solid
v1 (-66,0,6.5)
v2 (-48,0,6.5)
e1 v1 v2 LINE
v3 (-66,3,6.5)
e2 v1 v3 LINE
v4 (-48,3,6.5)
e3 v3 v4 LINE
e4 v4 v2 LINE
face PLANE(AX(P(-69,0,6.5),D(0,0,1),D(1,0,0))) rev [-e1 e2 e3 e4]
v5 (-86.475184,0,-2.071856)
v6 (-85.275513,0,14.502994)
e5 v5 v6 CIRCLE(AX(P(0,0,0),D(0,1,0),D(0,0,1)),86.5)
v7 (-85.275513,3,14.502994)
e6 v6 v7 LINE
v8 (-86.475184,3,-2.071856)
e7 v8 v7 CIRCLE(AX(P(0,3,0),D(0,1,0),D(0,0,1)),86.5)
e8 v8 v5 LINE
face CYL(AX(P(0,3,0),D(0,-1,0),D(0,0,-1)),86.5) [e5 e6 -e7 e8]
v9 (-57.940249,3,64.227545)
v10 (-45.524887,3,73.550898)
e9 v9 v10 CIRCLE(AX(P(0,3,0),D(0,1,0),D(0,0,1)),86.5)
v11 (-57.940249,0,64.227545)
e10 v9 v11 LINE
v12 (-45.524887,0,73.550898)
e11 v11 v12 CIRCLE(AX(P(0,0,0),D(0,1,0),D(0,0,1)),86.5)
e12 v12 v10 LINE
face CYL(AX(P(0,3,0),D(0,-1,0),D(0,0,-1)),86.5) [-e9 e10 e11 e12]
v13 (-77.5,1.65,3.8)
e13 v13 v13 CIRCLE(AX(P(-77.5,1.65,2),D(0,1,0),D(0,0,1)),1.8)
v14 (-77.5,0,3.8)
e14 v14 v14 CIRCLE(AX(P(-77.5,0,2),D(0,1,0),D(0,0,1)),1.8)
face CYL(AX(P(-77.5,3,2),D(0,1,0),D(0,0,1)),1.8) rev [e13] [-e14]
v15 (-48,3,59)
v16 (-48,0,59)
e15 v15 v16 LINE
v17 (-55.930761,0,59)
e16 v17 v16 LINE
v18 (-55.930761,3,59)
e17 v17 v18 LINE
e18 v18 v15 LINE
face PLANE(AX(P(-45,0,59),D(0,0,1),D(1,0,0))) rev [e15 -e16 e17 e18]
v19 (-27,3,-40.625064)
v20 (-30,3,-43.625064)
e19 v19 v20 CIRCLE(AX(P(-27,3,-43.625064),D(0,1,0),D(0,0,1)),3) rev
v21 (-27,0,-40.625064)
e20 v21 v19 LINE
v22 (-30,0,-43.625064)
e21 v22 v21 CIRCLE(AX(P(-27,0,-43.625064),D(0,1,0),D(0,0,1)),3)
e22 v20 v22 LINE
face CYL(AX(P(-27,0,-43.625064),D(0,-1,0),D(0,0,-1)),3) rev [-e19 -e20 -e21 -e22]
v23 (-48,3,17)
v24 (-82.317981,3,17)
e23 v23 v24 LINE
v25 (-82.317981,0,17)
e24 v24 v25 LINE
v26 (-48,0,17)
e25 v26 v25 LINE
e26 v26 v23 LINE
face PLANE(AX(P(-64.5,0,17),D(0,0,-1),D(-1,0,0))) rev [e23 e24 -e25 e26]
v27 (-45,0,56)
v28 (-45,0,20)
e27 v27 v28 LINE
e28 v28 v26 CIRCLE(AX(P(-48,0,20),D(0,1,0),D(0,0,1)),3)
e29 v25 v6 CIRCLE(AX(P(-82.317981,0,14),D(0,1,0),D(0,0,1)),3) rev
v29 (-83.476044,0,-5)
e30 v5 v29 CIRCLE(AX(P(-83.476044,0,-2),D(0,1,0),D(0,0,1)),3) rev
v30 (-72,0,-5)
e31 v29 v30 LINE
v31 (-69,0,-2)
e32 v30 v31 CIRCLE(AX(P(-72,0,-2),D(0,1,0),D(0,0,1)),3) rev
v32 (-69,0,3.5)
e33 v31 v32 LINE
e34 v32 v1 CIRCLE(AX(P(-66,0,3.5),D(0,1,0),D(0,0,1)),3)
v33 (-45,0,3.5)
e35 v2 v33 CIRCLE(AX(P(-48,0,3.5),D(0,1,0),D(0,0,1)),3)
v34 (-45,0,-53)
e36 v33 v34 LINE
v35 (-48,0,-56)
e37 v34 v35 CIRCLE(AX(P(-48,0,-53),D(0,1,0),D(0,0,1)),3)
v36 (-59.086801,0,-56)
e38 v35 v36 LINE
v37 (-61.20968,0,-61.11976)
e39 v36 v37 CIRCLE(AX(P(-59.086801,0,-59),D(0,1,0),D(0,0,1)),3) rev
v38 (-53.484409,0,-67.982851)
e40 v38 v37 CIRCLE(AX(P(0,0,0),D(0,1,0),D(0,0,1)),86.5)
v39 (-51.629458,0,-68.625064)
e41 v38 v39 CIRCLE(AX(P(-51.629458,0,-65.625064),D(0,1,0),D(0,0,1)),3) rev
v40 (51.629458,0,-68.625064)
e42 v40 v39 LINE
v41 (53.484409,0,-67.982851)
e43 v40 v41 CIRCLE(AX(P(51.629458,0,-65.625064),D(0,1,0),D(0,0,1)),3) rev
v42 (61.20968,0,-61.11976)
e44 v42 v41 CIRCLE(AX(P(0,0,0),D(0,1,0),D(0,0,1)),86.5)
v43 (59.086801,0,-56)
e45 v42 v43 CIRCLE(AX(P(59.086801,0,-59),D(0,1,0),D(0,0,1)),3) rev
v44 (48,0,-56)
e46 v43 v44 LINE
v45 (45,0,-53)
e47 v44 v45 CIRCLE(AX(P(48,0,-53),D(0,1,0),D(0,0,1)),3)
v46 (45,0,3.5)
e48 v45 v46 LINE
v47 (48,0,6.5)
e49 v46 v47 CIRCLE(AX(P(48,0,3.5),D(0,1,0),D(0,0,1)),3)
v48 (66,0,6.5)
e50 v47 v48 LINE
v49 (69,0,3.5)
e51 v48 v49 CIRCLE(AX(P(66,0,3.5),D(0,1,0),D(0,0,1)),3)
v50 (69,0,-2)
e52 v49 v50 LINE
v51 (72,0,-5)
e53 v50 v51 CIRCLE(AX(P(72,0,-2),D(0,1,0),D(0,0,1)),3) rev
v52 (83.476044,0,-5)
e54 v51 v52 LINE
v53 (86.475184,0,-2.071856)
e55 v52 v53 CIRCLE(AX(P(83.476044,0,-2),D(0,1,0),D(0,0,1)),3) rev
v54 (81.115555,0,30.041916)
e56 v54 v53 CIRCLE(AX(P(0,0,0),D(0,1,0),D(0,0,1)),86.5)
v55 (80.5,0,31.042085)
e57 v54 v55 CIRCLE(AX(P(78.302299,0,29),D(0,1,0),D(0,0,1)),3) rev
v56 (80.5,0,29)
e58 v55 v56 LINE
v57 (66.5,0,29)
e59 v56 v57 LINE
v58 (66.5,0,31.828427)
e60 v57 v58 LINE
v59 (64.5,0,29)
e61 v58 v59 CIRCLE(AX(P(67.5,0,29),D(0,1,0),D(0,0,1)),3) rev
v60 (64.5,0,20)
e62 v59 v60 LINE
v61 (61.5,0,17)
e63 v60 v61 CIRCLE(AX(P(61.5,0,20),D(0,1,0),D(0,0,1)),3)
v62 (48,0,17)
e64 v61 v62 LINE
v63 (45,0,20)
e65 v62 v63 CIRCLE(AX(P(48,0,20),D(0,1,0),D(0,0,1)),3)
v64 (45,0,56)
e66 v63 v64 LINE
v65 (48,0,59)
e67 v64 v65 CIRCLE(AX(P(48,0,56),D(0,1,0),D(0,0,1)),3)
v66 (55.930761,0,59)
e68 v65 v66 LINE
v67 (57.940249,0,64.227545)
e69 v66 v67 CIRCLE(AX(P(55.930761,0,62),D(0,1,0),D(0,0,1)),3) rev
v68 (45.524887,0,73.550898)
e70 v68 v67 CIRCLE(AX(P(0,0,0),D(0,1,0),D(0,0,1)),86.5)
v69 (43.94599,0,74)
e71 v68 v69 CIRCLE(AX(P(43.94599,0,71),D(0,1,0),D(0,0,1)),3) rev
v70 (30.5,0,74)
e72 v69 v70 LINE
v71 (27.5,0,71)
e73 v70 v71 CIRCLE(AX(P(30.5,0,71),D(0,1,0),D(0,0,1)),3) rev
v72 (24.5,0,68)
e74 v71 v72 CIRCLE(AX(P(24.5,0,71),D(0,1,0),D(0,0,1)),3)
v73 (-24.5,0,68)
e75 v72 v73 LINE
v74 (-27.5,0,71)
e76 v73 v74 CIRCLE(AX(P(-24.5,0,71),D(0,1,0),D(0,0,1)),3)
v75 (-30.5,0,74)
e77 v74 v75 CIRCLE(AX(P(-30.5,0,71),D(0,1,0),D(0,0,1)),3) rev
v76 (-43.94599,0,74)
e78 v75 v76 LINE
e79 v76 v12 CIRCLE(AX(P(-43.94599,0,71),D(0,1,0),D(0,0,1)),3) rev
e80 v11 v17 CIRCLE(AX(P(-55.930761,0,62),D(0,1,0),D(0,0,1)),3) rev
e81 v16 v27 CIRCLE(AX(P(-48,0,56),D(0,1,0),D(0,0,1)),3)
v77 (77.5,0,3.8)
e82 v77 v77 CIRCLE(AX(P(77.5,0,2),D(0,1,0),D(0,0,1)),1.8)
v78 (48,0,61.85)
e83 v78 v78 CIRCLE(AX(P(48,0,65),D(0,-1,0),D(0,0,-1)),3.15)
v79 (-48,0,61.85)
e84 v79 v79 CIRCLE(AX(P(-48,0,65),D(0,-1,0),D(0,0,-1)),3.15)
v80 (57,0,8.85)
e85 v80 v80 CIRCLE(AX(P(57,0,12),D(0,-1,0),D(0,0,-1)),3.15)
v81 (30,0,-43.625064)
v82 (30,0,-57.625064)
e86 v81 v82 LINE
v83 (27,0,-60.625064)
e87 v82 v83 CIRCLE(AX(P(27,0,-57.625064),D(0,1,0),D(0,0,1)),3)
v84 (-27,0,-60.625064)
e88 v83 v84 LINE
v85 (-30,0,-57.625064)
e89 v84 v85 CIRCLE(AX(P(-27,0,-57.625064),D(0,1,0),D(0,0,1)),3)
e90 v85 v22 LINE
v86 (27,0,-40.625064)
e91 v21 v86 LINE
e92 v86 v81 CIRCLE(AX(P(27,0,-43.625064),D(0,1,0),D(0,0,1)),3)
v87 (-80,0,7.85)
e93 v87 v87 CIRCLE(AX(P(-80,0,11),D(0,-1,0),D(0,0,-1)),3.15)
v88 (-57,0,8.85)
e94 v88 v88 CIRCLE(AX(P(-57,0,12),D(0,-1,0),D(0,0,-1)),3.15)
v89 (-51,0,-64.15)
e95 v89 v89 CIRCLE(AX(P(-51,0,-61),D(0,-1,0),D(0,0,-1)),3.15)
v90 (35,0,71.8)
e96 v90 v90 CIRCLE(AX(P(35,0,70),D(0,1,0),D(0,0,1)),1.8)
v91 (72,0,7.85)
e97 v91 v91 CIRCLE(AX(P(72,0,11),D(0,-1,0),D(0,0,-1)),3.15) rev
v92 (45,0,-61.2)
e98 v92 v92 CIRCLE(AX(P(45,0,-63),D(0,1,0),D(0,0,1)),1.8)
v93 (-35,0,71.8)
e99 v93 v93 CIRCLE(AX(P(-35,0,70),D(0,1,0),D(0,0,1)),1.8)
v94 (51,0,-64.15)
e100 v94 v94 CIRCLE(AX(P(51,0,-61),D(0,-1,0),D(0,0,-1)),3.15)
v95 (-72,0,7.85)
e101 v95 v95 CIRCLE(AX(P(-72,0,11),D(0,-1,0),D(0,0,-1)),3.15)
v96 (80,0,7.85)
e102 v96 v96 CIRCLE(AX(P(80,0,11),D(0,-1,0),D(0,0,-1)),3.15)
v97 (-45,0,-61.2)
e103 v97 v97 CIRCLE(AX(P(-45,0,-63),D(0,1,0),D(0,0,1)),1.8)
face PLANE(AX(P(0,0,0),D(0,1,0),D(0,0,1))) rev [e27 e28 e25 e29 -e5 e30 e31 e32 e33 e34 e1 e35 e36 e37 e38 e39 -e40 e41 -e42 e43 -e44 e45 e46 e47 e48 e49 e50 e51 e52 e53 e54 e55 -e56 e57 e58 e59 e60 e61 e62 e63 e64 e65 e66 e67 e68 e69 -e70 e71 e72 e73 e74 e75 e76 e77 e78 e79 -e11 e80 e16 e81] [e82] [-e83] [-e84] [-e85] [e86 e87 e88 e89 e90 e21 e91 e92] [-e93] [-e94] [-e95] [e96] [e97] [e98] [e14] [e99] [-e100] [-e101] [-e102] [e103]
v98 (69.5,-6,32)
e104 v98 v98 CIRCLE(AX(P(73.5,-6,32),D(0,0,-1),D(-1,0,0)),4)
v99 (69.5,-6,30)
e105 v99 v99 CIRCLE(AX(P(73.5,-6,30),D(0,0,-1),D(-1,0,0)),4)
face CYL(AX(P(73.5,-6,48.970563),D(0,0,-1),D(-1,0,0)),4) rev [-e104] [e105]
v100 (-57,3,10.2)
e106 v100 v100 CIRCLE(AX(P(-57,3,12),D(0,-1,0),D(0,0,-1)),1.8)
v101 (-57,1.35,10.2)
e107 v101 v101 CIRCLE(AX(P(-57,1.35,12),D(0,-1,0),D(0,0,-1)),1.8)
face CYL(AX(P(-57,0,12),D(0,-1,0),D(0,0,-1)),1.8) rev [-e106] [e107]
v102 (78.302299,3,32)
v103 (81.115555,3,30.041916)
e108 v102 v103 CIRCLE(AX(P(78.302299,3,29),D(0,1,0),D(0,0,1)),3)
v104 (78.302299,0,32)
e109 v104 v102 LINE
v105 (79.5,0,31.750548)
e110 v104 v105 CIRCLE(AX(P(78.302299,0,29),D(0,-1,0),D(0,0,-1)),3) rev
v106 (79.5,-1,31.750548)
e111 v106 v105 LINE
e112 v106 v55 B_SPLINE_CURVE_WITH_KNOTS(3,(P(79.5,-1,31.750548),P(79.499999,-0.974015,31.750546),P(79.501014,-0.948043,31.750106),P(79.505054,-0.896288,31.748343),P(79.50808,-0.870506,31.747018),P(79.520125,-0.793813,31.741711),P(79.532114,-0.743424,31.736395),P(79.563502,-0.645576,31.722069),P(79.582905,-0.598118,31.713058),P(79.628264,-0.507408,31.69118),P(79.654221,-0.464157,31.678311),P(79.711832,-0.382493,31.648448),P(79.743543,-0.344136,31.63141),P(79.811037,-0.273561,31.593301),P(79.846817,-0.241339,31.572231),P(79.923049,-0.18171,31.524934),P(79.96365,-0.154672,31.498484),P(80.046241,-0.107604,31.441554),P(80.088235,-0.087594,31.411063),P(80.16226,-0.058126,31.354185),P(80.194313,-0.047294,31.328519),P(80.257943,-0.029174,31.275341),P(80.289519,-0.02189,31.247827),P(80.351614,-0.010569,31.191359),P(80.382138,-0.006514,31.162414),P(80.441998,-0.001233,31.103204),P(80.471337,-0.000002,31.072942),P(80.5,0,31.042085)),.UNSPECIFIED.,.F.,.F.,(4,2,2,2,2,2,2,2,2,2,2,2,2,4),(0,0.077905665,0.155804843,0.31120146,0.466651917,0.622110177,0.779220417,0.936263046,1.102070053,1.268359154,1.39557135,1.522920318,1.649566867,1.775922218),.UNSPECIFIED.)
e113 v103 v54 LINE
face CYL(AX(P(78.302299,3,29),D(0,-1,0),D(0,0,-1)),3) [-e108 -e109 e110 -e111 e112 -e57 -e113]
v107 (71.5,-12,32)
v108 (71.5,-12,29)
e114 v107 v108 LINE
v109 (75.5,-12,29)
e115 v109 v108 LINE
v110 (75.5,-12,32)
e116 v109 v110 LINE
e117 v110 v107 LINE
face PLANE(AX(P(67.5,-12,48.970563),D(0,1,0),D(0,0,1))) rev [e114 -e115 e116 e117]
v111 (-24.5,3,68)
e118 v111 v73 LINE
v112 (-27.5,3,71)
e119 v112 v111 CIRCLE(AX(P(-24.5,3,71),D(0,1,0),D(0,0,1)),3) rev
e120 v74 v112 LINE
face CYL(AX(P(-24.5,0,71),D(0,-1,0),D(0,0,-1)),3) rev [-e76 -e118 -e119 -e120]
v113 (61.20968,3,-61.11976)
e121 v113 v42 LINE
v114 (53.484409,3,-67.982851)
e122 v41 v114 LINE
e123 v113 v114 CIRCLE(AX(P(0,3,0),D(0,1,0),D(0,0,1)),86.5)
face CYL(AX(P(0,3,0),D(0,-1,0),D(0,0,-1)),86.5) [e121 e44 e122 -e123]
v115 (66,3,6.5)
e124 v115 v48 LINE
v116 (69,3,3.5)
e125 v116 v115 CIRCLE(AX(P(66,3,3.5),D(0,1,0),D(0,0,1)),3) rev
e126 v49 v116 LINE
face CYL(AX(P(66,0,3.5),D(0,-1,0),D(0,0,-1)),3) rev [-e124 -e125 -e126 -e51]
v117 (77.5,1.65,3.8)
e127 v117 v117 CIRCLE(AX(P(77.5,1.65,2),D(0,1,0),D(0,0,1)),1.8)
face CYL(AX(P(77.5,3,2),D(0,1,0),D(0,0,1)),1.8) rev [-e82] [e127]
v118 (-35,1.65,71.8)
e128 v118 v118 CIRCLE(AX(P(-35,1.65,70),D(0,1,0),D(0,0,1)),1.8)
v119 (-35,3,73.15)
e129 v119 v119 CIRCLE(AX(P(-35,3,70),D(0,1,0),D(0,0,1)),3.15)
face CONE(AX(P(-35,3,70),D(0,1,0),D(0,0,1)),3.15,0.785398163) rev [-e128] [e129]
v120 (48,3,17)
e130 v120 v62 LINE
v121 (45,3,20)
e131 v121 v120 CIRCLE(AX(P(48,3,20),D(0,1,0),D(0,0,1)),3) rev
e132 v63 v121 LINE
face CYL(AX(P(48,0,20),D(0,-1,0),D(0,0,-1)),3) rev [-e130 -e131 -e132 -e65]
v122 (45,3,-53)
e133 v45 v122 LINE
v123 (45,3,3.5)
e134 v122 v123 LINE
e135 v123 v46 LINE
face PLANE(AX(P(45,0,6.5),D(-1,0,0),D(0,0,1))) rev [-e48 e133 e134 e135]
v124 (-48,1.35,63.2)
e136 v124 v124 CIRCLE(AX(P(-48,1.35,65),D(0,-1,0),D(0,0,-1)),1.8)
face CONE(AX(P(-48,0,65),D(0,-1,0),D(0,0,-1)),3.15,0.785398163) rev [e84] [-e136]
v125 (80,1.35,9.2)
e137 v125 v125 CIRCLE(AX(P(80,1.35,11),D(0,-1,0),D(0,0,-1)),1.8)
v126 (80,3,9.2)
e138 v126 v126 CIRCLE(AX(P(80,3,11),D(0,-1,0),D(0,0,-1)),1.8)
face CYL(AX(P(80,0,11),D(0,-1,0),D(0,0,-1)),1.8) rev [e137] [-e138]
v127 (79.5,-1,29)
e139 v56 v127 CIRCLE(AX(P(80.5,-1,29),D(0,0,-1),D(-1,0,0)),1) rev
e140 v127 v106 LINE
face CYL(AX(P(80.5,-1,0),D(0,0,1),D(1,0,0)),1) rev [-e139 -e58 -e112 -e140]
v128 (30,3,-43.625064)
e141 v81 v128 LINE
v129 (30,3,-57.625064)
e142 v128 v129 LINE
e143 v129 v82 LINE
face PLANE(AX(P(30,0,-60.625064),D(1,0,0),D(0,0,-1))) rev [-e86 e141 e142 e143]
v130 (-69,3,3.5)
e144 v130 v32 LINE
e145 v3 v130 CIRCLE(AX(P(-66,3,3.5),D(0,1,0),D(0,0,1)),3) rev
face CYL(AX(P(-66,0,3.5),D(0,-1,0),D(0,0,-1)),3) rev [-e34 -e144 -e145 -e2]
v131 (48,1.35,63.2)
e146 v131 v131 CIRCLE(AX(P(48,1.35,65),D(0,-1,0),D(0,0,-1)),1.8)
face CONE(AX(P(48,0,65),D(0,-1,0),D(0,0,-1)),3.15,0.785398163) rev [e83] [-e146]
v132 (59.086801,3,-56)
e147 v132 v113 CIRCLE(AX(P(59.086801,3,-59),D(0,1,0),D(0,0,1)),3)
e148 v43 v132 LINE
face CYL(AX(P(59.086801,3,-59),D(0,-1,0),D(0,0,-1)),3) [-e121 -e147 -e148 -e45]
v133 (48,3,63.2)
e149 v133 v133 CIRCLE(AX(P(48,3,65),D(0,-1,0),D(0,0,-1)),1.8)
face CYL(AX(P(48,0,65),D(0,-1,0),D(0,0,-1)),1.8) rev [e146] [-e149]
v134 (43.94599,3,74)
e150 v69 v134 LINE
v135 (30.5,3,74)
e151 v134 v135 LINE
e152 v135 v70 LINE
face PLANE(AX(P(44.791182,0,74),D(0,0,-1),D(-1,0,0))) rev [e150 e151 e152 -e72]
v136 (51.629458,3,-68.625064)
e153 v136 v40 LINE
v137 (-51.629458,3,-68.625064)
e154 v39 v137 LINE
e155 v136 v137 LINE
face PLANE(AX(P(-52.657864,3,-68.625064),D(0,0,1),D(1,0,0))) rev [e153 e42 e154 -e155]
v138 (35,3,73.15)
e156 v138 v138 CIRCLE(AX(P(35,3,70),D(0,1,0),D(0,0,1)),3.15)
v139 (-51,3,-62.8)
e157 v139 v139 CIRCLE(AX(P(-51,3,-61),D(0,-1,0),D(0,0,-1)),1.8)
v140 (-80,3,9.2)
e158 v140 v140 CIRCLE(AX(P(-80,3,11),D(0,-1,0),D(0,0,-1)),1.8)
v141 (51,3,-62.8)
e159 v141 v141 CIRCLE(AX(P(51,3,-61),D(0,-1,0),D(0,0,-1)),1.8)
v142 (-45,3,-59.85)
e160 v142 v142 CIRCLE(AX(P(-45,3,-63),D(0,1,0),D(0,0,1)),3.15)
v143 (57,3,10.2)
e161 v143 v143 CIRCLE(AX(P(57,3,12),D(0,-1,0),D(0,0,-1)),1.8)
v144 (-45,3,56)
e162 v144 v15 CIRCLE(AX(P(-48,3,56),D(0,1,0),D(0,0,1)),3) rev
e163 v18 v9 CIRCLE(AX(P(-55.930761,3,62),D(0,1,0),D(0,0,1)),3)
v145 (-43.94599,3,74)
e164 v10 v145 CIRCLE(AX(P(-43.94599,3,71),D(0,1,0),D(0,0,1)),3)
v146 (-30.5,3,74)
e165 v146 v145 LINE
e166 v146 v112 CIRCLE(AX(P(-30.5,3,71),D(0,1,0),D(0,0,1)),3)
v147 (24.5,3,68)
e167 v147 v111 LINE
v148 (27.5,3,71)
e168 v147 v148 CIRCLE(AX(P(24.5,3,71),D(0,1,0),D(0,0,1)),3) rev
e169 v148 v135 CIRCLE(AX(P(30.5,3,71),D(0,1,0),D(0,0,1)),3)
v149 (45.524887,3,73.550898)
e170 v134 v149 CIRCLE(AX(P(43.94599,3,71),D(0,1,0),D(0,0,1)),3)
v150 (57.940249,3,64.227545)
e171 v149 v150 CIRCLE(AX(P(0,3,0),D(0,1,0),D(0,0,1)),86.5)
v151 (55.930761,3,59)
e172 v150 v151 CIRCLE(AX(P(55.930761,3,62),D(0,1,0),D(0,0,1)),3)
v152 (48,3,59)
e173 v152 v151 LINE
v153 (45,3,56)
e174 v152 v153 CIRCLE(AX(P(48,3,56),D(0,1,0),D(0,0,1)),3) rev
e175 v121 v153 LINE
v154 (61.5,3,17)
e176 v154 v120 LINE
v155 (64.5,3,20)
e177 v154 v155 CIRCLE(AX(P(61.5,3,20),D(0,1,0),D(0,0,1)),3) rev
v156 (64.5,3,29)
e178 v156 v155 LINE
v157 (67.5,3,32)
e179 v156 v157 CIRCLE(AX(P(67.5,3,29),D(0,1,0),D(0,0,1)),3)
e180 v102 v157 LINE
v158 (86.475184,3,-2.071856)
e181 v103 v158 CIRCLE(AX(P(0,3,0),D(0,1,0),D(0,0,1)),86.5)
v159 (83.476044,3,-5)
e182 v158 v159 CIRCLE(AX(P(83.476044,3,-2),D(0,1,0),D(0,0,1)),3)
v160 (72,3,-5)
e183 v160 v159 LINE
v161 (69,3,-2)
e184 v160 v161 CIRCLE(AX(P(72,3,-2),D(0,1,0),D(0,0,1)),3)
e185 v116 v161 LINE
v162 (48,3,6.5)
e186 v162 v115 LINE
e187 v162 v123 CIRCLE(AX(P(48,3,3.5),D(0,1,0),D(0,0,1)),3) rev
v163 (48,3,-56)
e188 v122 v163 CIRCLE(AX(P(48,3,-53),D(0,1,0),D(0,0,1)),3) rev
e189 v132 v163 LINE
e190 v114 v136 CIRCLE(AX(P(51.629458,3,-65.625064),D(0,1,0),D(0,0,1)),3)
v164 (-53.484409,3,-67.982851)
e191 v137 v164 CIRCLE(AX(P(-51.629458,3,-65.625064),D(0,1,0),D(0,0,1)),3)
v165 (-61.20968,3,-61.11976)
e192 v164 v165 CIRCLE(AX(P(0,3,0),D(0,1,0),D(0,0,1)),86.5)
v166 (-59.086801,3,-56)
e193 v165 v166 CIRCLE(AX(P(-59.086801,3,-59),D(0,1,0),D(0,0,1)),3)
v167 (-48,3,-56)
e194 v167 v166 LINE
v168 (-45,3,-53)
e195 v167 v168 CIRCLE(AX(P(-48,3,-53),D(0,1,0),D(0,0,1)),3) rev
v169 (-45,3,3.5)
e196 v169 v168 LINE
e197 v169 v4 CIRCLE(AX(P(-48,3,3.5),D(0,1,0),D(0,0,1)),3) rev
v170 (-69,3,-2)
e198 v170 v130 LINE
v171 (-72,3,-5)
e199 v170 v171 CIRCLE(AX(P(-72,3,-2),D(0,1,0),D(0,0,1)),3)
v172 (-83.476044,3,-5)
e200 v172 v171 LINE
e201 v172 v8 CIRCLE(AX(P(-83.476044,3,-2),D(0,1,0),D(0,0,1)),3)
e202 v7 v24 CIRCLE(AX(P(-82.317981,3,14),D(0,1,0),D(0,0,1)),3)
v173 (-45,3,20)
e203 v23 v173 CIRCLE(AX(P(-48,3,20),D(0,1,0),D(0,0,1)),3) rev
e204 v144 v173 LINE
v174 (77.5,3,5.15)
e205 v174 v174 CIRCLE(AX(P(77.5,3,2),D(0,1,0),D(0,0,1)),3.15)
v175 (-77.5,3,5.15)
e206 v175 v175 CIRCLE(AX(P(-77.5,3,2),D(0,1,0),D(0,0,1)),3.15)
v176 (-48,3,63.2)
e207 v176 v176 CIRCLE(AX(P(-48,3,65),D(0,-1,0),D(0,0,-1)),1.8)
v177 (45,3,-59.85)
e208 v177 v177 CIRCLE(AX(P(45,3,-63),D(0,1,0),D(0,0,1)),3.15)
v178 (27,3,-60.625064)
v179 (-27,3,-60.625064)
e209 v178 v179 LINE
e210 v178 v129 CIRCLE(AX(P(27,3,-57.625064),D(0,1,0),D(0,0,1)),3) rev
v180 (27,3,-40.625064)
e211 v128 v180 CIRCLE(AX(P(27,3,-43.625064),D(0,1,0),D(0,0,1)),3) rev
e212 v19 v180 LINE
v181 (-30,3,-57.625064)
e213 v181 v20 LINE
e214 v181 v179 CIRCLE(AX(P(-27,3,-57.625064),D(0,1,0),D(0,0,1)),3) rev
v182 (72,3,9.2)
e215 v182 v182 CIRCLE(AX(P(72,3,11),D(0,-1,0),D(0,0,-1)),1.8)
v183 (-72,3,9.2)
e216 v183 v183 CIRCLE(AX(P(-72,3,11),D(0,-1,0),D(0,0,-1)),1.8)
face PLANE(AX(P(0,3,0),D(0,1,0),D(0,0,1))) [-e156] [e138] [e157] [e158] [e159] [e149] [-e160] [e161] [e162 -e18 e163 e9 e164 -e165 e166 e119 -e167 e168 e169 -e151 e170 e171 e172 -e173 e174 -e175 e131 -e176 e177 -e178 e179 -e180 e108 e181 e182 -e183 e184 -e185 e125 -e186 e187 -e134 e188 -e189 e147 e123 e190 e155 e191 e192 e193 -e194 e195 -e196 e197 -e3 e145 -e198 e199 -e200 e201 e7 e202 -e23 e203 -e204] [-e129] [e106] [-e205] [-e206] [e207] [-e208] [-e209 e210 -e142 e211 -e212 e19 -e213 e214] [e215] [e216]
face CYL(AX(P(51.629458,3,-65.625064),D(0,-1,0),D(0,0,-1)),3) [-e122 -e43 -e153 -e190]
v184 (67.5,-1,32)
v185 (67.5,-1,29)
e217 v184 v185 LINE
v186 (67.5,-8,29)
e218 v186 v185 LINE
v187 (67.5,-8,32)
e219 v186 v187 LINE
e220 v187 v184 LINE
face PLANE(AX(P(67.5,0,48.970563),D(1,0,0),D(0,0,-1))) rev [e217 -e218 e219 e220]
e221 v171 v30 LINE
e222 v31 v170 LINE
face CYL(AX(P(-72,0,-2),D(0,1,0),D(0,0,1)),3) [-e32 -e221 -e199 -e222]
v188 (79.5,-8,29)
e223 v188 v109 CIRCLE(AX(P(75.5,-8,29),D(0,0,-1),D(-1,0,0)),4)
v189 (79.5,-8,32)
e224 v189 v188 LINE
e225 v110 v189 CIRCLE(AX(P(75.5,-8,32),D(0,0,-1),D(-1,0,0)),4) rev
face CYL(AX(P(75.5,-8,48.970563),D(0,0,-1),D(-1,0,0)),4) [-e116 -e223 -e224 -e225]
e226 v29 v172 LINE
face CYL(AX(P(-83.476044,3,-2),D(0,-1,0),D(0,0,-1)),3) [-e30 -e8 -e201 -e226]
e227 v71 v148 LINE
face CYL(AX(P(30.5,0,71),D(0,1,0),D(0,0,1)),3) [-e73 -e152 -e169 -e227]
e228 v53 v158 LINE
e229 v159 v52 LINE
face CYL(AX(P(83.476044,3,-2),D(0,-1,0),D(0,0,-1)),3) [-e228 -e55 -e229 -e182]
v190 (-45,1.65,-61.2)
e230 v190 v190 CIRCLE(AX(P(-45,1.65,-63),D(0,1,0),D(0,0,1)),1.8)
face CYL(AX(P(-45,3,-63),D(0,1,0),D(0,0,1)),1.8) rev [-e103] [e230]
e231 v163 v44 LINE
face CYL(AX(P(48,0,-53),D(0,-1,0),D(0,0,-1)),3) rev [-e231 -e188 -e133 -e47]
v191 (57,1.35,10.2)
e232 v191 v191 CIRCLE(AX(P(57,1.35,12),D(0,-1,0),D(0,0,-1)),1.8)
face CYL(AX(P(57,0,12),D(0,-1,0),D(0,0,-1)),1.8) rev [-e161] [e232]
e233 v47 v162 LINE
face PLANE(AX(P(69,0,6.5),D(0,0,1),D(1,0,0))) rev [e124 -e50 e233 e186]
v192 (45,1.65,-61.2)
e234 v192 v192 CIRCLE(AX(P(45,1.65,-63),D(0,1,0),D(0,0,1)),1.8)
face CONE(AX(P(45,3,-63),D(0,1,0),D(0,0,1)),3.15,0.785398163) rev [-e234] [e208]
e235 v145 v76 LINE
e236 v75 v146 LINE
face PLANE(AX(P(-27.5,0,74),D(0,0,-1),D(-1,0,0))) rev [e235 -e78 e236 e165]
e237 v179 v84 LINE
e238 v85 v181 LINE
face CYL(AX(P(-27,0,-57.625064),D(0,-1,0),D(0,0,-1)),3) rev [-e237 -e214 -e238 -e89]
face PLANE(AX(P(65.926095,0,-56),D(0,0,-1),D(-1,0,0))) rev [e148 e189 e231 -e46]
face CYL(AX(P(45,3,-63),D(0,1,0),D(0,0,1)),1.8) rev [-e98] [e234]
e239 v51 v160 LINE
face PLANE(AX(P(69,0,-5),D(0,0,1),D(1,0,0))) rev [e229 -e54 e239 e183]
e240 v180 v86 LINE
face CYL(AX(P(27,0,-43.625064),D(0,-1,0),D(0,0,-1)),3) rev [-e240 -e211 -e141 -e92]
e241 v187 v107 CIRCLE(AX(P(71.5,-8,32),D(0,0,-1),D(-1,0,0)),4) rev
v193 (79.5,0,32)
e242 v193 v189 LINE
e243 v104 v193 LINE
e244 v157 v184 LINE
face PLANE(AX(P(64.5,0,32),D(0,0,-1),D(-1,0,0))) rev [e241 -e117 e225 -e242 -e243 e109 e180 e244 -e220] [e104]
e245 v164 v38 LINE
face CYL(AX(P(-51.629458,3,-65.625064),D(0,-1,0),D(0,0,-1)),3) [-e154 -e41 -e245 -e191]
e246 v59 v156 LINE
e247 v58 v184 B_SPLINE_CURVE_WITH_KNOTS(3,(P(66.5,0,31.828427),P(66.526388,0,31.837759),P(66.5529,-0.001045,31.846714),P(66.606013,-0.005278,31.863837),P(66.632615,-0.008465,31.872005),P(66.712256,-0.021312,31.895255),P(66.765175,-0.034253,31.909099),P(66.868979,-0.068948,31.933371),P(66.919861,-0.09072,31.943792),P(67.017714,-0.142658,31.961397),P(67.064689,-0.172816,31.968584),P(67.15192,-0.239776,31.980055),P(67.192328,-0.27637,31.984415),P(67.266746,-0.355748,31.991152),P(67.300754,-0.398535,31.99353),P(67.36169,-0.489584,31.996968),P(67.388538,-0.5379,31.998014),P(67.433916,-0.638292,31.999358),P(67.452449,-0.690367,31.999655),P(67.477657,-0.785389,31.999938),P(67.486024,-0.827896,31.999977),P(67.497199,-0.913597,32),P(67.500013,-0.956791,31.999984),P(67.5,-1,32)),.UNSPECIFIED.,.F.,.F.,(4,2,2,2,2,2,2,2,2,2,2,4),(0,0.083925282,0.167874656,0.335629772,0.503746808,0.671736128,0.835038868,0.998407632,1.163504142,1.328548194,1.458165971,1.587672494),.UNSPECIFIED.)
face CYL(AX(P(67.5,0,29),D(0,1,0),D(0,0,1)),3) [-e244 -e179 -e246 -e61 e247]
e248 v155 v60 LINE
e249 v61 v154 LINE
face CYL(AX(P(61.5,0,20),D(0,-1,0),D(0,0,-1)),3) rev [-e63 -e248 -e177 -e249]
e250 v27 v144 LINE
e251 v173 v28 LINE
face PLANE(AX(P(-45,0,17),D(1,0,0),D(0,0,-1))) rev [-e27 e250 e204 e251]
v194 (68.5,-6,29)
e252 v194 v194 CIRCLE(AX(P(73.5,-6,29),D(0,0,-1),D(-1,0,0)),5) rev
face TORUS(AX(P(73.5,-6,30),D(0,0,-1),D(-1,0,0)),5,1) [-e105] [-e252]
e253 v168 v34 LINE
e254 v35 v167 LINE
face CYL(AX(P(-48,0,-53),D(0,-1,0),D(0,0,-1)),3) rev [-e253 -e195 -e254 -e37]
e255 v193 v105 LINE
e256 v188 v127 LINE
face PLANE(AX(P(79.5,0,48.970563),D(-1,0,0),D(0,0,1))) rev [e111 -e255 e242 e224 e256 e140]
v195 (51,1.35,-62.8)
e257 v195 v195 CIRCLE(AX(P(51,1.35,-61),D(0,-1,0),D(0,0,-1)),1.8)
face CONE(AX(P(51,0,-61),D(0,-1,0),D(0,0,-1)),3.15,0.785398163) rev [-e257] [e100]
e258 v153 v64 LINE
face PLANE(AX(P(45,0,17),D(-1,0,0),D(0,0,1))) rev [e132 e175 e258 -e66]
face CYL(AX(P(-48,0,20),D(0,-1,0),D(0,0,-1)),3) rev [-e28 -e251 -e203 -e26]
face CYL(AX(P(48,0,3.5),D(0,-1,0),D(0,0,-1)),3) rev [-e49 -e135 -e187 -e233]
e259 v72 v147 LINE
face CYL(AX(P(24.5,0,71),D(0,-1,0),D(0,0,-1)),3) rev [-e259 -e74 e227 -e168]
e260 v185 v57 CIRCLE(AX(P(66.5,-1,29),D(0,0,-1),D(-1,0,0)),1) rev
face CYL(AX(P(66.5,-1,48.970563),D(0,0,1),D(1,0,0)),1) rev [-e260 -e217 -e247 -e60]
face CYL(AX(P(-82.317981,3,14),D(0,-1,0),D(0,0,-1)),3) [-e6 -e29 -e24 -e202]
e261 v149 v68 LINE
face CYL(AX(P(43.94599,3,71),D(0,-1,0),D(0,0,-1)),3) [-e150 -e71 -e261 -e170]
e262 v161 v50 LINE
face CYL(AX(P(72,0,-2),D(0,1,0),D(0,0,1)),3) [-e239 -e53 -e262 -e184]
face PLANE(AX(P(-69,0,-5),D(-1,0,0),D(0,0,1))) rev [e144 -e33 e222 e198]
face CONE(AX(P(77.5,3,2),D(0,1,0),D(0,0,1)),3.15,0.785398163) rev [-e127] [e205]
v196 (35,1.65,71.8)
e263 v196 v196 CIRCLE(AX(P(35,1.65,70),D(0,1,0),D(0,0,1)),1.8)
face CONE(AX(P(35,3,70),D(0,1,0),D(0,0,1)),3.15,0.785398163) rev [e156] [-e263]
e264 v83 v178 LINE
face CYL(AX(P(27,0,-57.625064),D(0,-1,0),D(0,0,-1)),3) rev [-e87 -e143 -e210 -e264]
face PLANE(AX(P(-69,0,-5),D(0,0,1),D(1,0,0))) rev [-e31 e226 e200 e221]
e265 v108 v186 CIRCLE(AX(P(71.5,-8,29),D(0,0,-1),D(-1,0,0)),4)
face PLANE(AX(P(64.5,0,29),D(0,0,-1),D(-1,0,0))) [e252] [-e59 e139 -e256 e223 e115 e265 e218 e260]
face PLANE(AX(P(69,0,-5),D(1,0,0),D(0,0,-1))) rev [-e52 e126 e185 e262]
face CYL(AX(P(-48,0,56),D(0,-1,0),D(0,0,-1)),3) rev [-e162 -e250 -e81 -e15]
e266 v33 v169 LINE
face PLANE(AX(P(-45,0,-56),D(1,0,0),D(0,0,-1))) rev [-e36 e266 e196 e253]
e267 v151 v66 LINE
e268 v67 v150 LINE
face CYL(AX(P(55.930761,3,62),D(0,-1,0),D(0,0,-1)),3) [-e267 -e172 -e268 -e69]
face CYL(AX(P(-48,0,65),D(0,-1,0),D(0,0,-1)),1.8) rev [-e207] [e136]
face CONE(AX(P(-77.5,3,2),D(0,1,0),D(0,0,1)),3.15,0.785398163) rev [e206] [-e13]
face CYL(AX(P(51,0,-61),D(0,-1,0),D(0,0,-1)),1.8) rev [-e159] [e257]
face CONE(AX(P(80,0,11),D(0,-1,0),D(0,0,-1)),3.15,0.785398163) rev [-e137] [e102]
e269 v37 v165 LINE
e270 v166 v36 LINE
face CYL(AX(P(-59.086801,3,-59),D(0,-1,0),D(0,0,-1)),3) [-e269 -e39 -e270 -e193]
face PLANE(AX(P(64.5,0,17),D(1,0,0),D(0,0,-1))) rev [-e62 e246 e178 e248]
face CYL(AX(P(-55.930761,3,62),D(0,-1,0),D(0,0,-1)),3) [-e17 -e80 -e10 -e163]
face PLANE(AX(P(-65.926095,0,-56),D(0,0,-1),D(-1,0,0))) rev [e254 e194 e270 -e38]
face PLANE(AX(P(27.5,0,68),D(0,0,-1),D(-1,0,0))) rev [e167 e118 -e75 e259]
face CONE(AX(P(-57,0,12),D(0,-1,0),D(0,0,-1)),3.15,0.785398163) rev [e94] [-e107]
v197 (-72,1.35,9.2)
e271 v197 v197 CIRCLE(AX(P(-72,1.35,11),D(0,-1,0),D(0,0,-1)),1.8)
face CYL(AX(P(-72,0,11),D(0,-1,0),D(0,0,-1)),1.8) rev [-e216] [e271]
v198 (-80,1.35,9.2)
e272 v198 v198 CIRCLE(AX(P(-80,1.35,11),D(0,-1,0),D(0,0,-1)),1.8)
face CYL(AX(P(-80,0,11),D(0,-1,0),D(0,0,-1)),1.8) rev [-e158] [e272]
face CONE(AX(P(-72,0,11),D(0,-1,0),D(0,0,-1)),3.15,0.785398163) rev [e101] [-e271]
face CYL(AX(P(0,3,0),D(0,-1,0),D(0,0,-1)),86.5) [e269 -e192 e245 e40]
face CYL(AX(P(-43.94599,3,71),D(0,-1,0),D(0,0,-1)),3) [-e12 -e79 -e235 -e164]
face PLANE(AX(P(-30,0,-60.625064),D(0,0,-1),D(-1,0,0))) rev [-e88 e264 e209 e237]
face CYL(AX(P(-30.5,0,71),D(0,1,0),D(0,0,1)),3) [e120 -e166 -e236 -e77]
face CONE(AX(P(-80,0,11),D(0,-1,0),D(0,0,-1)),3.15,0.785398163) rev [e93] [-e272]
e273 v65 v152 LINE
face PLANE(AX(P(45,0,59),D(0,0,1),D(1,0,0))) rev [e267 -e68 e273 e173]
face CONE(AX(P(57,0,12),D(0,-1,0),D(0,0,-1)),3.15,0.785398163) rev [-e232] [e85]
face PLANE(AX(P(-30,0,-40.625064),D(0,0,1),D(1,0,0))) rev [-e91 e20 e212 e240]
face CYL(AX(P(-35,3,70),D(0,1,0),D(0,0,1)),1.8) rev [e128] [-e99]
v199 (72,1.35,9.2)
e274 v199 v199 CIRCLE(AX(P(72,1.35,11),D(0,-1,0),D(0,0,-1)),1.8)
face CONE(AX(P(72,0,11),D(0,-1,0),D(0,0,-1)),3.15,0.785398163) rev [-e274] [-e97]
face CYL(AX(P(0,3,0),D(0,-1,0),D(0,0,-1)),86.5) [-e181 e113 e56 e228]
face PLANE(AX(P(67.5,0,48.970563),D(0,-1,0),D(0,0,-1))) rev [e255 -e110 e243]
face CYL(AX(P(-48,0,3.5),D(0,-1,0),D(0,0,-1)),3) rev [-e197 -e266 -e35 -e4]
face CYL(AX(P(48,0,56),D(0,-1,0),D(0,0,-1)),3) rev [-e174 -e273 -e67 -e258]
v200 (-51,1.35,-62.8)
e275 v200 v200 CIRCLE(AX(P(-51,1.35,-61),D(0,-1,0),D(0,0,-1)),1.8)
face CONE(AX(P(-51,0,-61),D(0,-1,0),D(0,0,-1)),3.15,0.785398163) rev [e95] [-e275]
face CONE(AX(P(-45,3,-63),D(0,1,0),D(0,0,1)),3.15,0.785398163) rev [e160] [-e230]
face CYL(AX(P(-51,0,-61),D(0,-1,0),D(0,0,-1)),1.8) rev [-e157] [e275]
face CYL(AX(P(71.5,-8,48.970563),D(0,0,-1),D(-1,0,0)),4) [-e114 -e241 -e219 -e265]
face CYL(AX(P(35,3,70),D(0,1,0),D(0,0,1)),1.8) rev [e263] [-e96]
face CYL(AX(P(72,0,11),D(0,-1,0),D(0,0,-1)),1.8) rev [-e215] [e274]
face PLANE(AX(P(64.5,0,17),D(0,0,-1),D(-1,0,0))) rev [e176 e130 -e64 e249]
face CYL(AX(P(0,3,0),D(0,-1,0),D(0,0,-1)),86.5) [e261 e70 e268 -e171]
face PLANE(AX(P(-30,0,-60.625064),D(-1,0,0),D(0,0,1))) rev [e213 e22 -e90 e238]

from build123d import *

# Parameters (mm, degrees)
BOSS_EXTRUDE1_DEPTH                           = 3
CSK_FOR_M3_COUNTERSUNK_FLAT_HEAD_SCR_2_COUNT  = 2
CSK_FOR_M3_COUNTERSUNK_FLAT_HEAD_SCR_2_PITCH  = 90
CSK_FOR_M3_COUNTERSUNK_FLAT_HEAD_SCR_3_COUNT  = 2
CSK_FOR_M3_COUNTERSUNK_FLAT_HEAD_SCR_3_PITCH  = 138.676782484
CSK_FOR_M3_COUNTERSUNK_FLAT_HEAD_SCR_4_COUNT  = 2
CSK_FOR_M3_COUNTERSUNK_FLAT_HEAD_SCR_4_PITCH  = 72.672209269
CSK_FOR_M3_COUNTERSUNK_FLAT_HEAD_SCR_5_COUNT  = 2
CSK_FOR_M3_COUNTERSUNK_FLAT_HEAD_SCR_5_PITCH  = 133.375410027
CSK_FOR_M3_COUNTERSUNK_FLAT_HEAD_SCR_6_COUNT  = 2
CSK_FOR_M3_COUNTERSUNK_FLAT_HEAD_SCR_6_PITCH  = 155.206314305
CSK_FOR_M3_COUNTERSUNK_FLAT_HEAD_SCR_7_COUNT  = 2
CSK_FOR_M3_COUNTERSUNK_FLAT_HEAD_SCR_7_PITCH  = 102
CSK_FOR_M3_COUNTERSUNK_FLAT_HEAD_SCR_8_COUNT  = 2
CSK_FOR_M3_COUNTERSUNK_FLAT_HEAD_SCR_8_PITCH  = 126.035709226
CSK_FOR_M3_COUNTERSUNK_FLAT_HEAD_SCR_9_COUNT  = 2
CSK_FOR_M3_COUNTERSUNK_FLAT_HEAD_SCR_9_PITCH  = 160.240444333
CSK_FOR_M3_COUNTERSUNK_FLAT_HEAD_SCR_10_COUNT = 2
CSK_FOR_M3_COUNTERSUNK_FLAT_HEAD_SCR_10_PITCH = 77.620873481
CSK_FOR_M3_COUNTERSUNK_FLAT_HEAD_SCR_11_COUNT = 2
CSK_FOR_M3_COUNTERSUNK_FLAT_HEAD_SCR_11_PITCH = 149.48244044
CSK_FOR_M3_COUNTERSUNK_FLAT_HEAD_SCR_12_COUNT = 2
CSK_FOR_M3_COUNTERSUNK_FLAT_HEAD_SCR_12_PITCH = 73.246160309
CSK_FOR_M3_COUNTERSUNK_FLAT_HEAD_SCR_13_COUNT = 2
CSK_FOR_M3_COUNTERSUNK_FLAT_HEAD_SCR_13_PITCH = 130.357201566
CSK_FOR_M3_COUNTERSUNK_FLAT_HEAD_SCR_14_COUNT = 2
CSK_FOR_M3_COUNTERSUNK_FLAT_HEAD_SCR_14_PITCH = 142.523682243
CSK_FOR_M3_COUNTERSUNK_FLAT_HEAD_SCR_15_COUNT = 2
CSK_FOR_M3_COUNTERSUNK_FLAT_HEAD_SCR_15_PITCH = 75
SKETCH14_W                                    = 60
SKETCH14_H                                    = 20
CUT_EXTRUDE1_DEPTH                            = 123.366253518
FILLET1_R                                     = 3
BOSS_EXTRUDE3_REACH                           = 115.874
SKETCH21_W                                    = 12
SKETCH21_H                                    = 12
SKETCH21_R                                    = 4
SKETCH21_2_W                                  = 12
SKETCH21_2_H                                  = 12
CUT_EXTRUDE3_DEPTH                            = 29
FILLET2_R                                     = 4
FILLET3_R                                     = 1


with BuildPart() as part:
    # Sketch1 → Boss-Extrude1 (new body)
    with BuildSketch(Plane(origin=(0, 0, 0), x_dir=(1, 0, 0), z_dir=(0, 1, 0))):
        with BuildLine():
            Line((-52.657863609, 68.625063935), (52.657863609, 68.625063935))
            ThreePointArc((52.657863609, 68.625063935), (0, -86.5), (-52.657863609, 68.625063935))
        make_face()
    extrude(amount=BOSS_EXTRUDE1_DEPTH)

    # Sketch9 → CSK for M3 Countersunk Flat Head Screw3 (revolve, cut)
    with BuildSketch(Plane(origin=(-45, 3, -63), x_dir=(0, 0, 1), z_dir=(1, 0, 0))):
        Polygon((0, 0), (0, 3), (1.8, 3), (1.8, 1.35), (3.15, 0), align=None)
    csk_for_m3_countersunk_flat_head_screw3 = revolve(axis=Axis((-45, 9.35, -63), (0, -1, 0)), mode=Mode.SUBTRACT)

    # CSK for M3 Countersunk Flat Head Scr 2: CSK for M3 Countersunk Flat Head Screw3 ×2
    with Locations(*[(i * CSK_FOR_M3_COUNTERSUNK_FLAT_HEAD_SCR_2_PITCH, 0, 0) for i in range(1, CSK_FOR_M3_COUNTERSUNK_FLAT_HEAD_SCR_2_COUNT)]):
        add(csk_for_m3_countersunk_flat_head_screw3, mode=Mode.SUBTRACT)

    # CSK for M3 Countersunk Flat Head Scr 3: CSK for M3 Countersunk Flat Head Screw3 ×2
    with Locations(*[Vector(0.8833490206949295, 0, 0.46871580689935033) * (i * CSK_FOR_M3_COUNTERSUNK_FLAT_HEAD_SCR_3_PITCH) for i in range(1, CSK_FOR_M3_COUNTERSUNK_FLAT_HEAD_SCR_3_COUNT)]):
        add(csk_for_m3_countersunk_flat_head_screw3, mode=Mode.SUBTRACT)

    # CSK for M3 Countersunk Flat Head Scr 4: CSK for M3 Countersunk Flat Head Screw3 ×2
    with Locations(*[Vector(-0.4472135954999581, 0, 0.894427190999916) * (i * CSK_FOR_M3_COUNTERSUNK_FLAT_HEAD_SCR_4_PITCH) for i in range(1, CSK_FOR_M3_COUNTERSUNK_FLAT_HEAD_SCR_4_COUNT)]):
        add(csk_for_m3_countersunk_flat_head_screw3, mode=Mode.SUBTRACT)

    # CSK for M3 Countersunk Flat Head Scr 5: CSK for M3 Countersunk Flat Head Screw3 ×2
    with Locations(*[Vector(0.07497633932626105, 0, 0.9971853130392733) * (i * CSK_FOR_M3_COUNTERSUNK_FLAT_HEAD_SCR_5_PITCH) for i in range(1, CSK_FOR_M3_COUNTERSUNK_FLAT_HEAD_SCR_5_COUNT)]):
        add(csk_for_m3_countersunk_flat_head_screw3, mode=Mode.SUBTRACT)

    # CSK for M3 Countersunk Flat Head Scr 6: CSK for M3 Countersunk Flat Head Screw3 ×2
    with Locations(*[Vector(0.5154429467542566, 0, 0.8569238989789517) * (i * CSK_FOR_M3_COUNTERSUNK_FLAT_HEAD_SCR_6_PITCH) for i in range(1, CSK_FOR_M3_COUNTERSUNK_FLAT_HEAD_SCR_6_COUNT)]):
        add(csk_for_m3_countersunk_flat_head_screw3, mode=Mode.SUBTRACT)

    # Sketch13 → CSK for M3 Countersunk Flat Head Screw4 (revolve, cut)
    with BuildSketch(Plane(origin=(-51, 0, -61), x_dir=(0, 0, -1), z_dir=(1, 0, 0))):
        Polygon((0, 0), (0, 3), (1.8, 3), (1.8, 1.35), (3.15, 0), align=None)
    csk_for_m3_countersunk_flat_head_screw4 = revolve(axis=Axis((-51, -6.35, -61), (0, 1, 0)), mode=Mode.SUBTRACT)

    # CSK for M3 Countersunk Flat Head Scr 7: CSK for M3 Countersunk Flat Head Screw4 ×2
    with Locations(*[(i * CSK_FOR_M3_COUNTERSUNK_FLAT_HEAD_SCR_7_PITCH, 0, 0) for i in range(1, CSK_FOR_M3_COUNTERSUNK_FLAT_HEAD_SCR_7_COUNT)]):
        add(csk_for_m3_countersunk_flat_head_screw4, mode=Mode.SUBTRACT)

    # CSK for M3 Countersunk Flat Head Scr 8: CSK for M3 Countersunk Flat Head Screw4 ×2
    with Locations(*[Vector(0.023802777946288843, 0, 0.9997166737441362) * (i * CSK_FOR_M3_COUNTERSUNK_FLAT_HEAD_SCR_8_PITCH) for i in range(1, CSK_FOR_M3_COUNTERSUNK_FLAT_HEAD_SCR_8_COUNT)]):
        add(csk_for_m3_countersunk_flat_head_screw4, mode=Mode.SUBTRACT)

    # CSK for M3 Countersunk Flat Head Scr 9: CSK for M3 Countersunk Flat Head Screw4 ×2
    with Locations(*[Vector(0.6178215519319036, 0, 0.7863183388224227) * (i * CSK_FOR_M3_COUNTERSUNK_FLAT_HEAD_SCR_9_PITCH) for i in range(1, CSK_FOR_M3_COUNTERSUNK_FLAT_HEAD_SCR_9_COUNT)]):
        add(csk_for_m3_countersunk_flat_head_screw4, mode=Mode.SUBTRACT)

    # CSK for M3 Countersunk Flat Head Scr 10: CSK for M3 Countersunk Flat Head Screw4 ×2
    with Locations(*[Vector(-0.373610843312482, 0, 0.9275855420171965) * (i * CSK_FOR_M3_COUNTERSUNK_FLAT_HEAD_SCR_10_PITCH) for i in range(1, CSK_FOR_M3_COUNTERSUNK_FLAT_HEAD_SCR_10_COUNT)]):
        add(csk_for_m3_countersunk_flat_head_screw4, mode=Mode.SUBTRACT)

    # CSK for M3 Countersunk Flat Head Scr 11: CSK for M3 Countersunk Flat Head Screw4 ×2
    with Locations(*[Vector(0.8763571133445796, 0, 0.4816619248916773) * (i * CSK_FOR_M3_COUNTERSUNK_FLAT_HEAD_SCR_11_PITCH) for i in range(1, CSK_FOR_M3_COUNTERSUNK_FLAT_HEAD_SCR_11_COUNT)]):
        add(csk_for_m3_countersunk_flat_head_screw4, mode=Mode.SUBTRACT)

    # CSK for M3 Countersunk Flat Head Scr 12: CSK for M3 Countersunk Flat Head Screw4 ×2
    with Locations(*[Vector(-0.08191555672945391, 0, 0.996639273541688) * (i * CSK_FOR_M3_COUNTERSUNK_FLAT_HEAD_SCR_12_PITCH) for i in range(1, CSK_FOR_M3_COUNTERSUNK_FLAT_HEAD_SCR_12_COUNT)]):
        add(csk_for_m3_countersunk_flat_head_screw4, mode=Mode.SUBTRACT)

    # CSK for M3 Countersunk Flat Head Scr 13: CSK for M3 Countersunk Flat Head Screw4 ×2
    with Locations(*[Vector(0.8284927775601016, 0, 0.559999747795254) * (i * CSK_FOR_M3_COUNTERSUNK_FLAT_HEAD_SCR_13_PITCH) for i in range(1, CSK_FOR_M3_COUNTERSUNK_FLAT_HEAD_SCR_13_COUNT)]):
        add(csk_for_m3_countersunk_flat_head_screw4, mode=Mode.SUBTRACT)

    # CSK for M3 Countersunk Flat Head Scr 14: CSK for M3 Countersunk Flat Head Screw4 ×2
    with Locations(*[Vector(0.8630144693469346, 0, 0.5051792015689374) * (i * CSK_FOR_M3_COUNTERSUNK_FLAT_HEAD_SCR_14_PITCH) for i in range(1, CSK_FOR_M3_COUNTERSUNK_FLAT_HEAD_SCR_14_COUNT)]):
        add(csk_for_m3_countersunk_flat_head_screw4, mode=Mode.SUBTRACT)

    # CSK for M3 Countersunk Flat Head Scr 15: CSK for M3 Countersunk Flat Head Screw4 ×2
    with Locations(*[Vector(-0.2800000000000003, 0, 0.96) * (i * CSK_FOR_M3_COUNTERSUNK_FLAT_HEAD_SCR_15_PITCH) for i in range(1, CSK_FOR_M3_COUNTERSUNK_FLAT_HEAD_SCR_15_COUNT)]):
        add(csk_for_m3_countersunk_flat_head_screw4, mode=Mode.SUBTRACT)

    # Sketch14 → Cut-Extrude1 (cut, through all)
    with BuildSketch(Plane(origin=(0, 3, 0), x_dir=(1, 0, 0), z_dir=(0, 1, 0))):
        with BuildLine():
            Line((65.926094985, 56), (45, 56))
            Line((45, 56), (45, 5))
            Line((45, 5), (45, -6.5))
            Line((45, -6.5), (69, -6.5))
            Line((69, -6.5), (69, 5))
            Line((69, 5), (86.355370418, 5))
            ThreePointArc((86.355370418, 5), (80.297329821, 32.165024851), (65.926094985, 56))
        make_face()
        with BuildLine():
            Line((64.5, -17), (45, -17))
            Line((45, -17), (45, -59))
            Line((45, -59), (63.255434549, -59))
            ThreePointArc((63.255434549, -59), (73.067302991, -46.297075864), (80.363237864, -32))
            Line((80.363237864, -32), (64.5, -32))
            Line((64.5, -32), (64.5, -17))
        make_face()
        with BuildLine():
            Line((-45, -59), (-63.255434549, -59))
            ThreePointArc((-63.255434549, -59), (-73.067302991, -46.297075864), (-80.363237864, -32))
            ThreePointArc((-80.363237864, -32), (-82.927979827, -24.600816282), (-84.813029659, -17))
            Line((-84.813029659, -17), (-64.5, -17))
            Line((-64.5, -17), (-45, -17))
            Line((-45, -17), (-45, -59))
        make_face()
        with BuildLine():
            Line((-69, 5), (-86.355370418, 5))
            ThreePointArc((-86.355370418, 5), (-80.297329821, 32.165024851), (-65.926094985, 56))
            Line((-65.926094985, 56), (-45, 56))
            Line((-45, 56), (-45, 5))
            Line((-45, 5), (-45, -6.5))
            Line((-45, -6.5), (-69, -6.5))
            Line((-69, -6.5), (-69, 5))
        make_face()
        with Locations((0, 50.625063935)):
            Rectangle(SKETCH14_W, SKETCH14_H)
        with BuildLine():
            Line((44.791182168, -74), (27.5, -74))
            Line((27.5, -74), (27.5, -68))
            Line((27.5, -68), (-27.5, -68))
            Line((-27.5, -68), (-27.5, -74))
            Line((-27.5, -74), (-44.791182168, -74))
            ThreePointArc((-44.791182168, -74), (0, -86.5), (44.791182168, -74))
        make_face()
    extrude(amount=-CUT_EXTRUDE1_DEPTH, mode=Mode.SUBTRACT)

    # Fillet1
    fillet1_edges = [part.edges().sort_by_distance(p)[0] for p in [
        (65.926094985, 1.5, -56),
        (45, 1.5, -56),
        (86.355370418, 1.5, -5),
        (45, 1.5, 17),
        (45, 1.5, 59),
        (63.255434549, 1.5, 59),
        (-63.255434549, 1.5, 59),
        (-45, 1.5, 59),
        (-84.813029659, 1.5, 17),
        (-45, 1.5, 17),
        (-86.355370418, 1.5, -5),
        (-65.926094985, 1.5, -56),
        (-45, 1.5, -56),
        (-30, 1.5, -40.625063935),
        (-30, 1.5, -60.625063935),
        (30, 1.5, -40.625063935),
        (30, 1.5, -60.625063935),
        (80.363237864, 1.5, 32),
        (64.5, 1.5, 32),
        (64.5, 1.5, 17),
        (-52.657863609, 1.5, -68.625063935),
        (52.657863609, 1.5, -68.625063935),
        (44.791182168, 1.5, 74),
        (-27.5, 1.5, 74),
        (-27.5, 1.5, 68),
        (27.5, 1.5, 68),
        (27.5, 1.5, 74),
        (-44.791182168, 1.5, 74),
        (-69, 1.5, 6.5),
        (-69, 1.5, -5),
        (-45, 1.5, 6.5),
        (69, 1.5, -5),
        (69, 1.5, 6.5),
        (45, 1.5, 6.5),
    ]]
    fillet(fillet1_edges, radius=FILLET1_R - 0.0001)  # a hair under: the kernel refuses the full size

    # Boss-Extrude3: up to this face of the body (flat: up to its plane)
    boss_extrude3_end = Plane(part.part.faces().sort_by_distance((72.901134209, 1.5, 32))[0])
    # Sketch21 → Boss-Extrude3 (add, up to the picked face)
    with BuildSketch(Plane.XY, mode=Mode.PRIVATE) as boss_extrude3_sk1:
        with Locations((73.5, -6)):
            Rectangle(SKETCH21_W, SKETCH21_H)
        with Locations(Location((73.5, -6, 0), (0, 0, 180))):
            Circle(SKETCH21_R, mode=Mode.SUBTRACT)
    boss_extrude3_tool1 = split(extrude(boss_extrude3_sk1.sketch, amount=BOSS_EXTRUDE3_REACH, mode=Mode.PRIVATE), bisect_by=boss_extrude3_end, keep=Keep.BOTH, mode=Mode.PRIVATE)
    add(boss_extrude3_tool1.solids().sort_by(Axis((73.5, -0.169706, 0), (0, 0, 1)))[0])

    # Sketch21<2> → Cut-Extrude3 (cut)
    with BuildSketch(Plane.XY):
        with Locations((73.5, -6)):
            Rectangle(SKETCH21_2_W, SKETCH21_2_H)
    extrude(amount=CUT_EXTRUDE3_DEPTH, mode=Mode.SUBTRACT)

    # Fillet2
    fillet2_edges = [part.edges().sort_by_distance(p)[0] for p in [
        (79.5, -12, 30.5),
        (67.5, -12, 30.5),
    ]]
    fillet(fillet2_edges, radius=FILLET2_R)

    # Fillet3
    fillet3_edges = [part.edges().sort_by_distance(p)[0] for p in [
        (79.5, 0, 30.375284399),
        (67.5, 0, 30.5),
        (77.5, -6, 29),
    ]]
    fillet(fillet3_edges, radius=FILLET3_R)


solid = part.part
